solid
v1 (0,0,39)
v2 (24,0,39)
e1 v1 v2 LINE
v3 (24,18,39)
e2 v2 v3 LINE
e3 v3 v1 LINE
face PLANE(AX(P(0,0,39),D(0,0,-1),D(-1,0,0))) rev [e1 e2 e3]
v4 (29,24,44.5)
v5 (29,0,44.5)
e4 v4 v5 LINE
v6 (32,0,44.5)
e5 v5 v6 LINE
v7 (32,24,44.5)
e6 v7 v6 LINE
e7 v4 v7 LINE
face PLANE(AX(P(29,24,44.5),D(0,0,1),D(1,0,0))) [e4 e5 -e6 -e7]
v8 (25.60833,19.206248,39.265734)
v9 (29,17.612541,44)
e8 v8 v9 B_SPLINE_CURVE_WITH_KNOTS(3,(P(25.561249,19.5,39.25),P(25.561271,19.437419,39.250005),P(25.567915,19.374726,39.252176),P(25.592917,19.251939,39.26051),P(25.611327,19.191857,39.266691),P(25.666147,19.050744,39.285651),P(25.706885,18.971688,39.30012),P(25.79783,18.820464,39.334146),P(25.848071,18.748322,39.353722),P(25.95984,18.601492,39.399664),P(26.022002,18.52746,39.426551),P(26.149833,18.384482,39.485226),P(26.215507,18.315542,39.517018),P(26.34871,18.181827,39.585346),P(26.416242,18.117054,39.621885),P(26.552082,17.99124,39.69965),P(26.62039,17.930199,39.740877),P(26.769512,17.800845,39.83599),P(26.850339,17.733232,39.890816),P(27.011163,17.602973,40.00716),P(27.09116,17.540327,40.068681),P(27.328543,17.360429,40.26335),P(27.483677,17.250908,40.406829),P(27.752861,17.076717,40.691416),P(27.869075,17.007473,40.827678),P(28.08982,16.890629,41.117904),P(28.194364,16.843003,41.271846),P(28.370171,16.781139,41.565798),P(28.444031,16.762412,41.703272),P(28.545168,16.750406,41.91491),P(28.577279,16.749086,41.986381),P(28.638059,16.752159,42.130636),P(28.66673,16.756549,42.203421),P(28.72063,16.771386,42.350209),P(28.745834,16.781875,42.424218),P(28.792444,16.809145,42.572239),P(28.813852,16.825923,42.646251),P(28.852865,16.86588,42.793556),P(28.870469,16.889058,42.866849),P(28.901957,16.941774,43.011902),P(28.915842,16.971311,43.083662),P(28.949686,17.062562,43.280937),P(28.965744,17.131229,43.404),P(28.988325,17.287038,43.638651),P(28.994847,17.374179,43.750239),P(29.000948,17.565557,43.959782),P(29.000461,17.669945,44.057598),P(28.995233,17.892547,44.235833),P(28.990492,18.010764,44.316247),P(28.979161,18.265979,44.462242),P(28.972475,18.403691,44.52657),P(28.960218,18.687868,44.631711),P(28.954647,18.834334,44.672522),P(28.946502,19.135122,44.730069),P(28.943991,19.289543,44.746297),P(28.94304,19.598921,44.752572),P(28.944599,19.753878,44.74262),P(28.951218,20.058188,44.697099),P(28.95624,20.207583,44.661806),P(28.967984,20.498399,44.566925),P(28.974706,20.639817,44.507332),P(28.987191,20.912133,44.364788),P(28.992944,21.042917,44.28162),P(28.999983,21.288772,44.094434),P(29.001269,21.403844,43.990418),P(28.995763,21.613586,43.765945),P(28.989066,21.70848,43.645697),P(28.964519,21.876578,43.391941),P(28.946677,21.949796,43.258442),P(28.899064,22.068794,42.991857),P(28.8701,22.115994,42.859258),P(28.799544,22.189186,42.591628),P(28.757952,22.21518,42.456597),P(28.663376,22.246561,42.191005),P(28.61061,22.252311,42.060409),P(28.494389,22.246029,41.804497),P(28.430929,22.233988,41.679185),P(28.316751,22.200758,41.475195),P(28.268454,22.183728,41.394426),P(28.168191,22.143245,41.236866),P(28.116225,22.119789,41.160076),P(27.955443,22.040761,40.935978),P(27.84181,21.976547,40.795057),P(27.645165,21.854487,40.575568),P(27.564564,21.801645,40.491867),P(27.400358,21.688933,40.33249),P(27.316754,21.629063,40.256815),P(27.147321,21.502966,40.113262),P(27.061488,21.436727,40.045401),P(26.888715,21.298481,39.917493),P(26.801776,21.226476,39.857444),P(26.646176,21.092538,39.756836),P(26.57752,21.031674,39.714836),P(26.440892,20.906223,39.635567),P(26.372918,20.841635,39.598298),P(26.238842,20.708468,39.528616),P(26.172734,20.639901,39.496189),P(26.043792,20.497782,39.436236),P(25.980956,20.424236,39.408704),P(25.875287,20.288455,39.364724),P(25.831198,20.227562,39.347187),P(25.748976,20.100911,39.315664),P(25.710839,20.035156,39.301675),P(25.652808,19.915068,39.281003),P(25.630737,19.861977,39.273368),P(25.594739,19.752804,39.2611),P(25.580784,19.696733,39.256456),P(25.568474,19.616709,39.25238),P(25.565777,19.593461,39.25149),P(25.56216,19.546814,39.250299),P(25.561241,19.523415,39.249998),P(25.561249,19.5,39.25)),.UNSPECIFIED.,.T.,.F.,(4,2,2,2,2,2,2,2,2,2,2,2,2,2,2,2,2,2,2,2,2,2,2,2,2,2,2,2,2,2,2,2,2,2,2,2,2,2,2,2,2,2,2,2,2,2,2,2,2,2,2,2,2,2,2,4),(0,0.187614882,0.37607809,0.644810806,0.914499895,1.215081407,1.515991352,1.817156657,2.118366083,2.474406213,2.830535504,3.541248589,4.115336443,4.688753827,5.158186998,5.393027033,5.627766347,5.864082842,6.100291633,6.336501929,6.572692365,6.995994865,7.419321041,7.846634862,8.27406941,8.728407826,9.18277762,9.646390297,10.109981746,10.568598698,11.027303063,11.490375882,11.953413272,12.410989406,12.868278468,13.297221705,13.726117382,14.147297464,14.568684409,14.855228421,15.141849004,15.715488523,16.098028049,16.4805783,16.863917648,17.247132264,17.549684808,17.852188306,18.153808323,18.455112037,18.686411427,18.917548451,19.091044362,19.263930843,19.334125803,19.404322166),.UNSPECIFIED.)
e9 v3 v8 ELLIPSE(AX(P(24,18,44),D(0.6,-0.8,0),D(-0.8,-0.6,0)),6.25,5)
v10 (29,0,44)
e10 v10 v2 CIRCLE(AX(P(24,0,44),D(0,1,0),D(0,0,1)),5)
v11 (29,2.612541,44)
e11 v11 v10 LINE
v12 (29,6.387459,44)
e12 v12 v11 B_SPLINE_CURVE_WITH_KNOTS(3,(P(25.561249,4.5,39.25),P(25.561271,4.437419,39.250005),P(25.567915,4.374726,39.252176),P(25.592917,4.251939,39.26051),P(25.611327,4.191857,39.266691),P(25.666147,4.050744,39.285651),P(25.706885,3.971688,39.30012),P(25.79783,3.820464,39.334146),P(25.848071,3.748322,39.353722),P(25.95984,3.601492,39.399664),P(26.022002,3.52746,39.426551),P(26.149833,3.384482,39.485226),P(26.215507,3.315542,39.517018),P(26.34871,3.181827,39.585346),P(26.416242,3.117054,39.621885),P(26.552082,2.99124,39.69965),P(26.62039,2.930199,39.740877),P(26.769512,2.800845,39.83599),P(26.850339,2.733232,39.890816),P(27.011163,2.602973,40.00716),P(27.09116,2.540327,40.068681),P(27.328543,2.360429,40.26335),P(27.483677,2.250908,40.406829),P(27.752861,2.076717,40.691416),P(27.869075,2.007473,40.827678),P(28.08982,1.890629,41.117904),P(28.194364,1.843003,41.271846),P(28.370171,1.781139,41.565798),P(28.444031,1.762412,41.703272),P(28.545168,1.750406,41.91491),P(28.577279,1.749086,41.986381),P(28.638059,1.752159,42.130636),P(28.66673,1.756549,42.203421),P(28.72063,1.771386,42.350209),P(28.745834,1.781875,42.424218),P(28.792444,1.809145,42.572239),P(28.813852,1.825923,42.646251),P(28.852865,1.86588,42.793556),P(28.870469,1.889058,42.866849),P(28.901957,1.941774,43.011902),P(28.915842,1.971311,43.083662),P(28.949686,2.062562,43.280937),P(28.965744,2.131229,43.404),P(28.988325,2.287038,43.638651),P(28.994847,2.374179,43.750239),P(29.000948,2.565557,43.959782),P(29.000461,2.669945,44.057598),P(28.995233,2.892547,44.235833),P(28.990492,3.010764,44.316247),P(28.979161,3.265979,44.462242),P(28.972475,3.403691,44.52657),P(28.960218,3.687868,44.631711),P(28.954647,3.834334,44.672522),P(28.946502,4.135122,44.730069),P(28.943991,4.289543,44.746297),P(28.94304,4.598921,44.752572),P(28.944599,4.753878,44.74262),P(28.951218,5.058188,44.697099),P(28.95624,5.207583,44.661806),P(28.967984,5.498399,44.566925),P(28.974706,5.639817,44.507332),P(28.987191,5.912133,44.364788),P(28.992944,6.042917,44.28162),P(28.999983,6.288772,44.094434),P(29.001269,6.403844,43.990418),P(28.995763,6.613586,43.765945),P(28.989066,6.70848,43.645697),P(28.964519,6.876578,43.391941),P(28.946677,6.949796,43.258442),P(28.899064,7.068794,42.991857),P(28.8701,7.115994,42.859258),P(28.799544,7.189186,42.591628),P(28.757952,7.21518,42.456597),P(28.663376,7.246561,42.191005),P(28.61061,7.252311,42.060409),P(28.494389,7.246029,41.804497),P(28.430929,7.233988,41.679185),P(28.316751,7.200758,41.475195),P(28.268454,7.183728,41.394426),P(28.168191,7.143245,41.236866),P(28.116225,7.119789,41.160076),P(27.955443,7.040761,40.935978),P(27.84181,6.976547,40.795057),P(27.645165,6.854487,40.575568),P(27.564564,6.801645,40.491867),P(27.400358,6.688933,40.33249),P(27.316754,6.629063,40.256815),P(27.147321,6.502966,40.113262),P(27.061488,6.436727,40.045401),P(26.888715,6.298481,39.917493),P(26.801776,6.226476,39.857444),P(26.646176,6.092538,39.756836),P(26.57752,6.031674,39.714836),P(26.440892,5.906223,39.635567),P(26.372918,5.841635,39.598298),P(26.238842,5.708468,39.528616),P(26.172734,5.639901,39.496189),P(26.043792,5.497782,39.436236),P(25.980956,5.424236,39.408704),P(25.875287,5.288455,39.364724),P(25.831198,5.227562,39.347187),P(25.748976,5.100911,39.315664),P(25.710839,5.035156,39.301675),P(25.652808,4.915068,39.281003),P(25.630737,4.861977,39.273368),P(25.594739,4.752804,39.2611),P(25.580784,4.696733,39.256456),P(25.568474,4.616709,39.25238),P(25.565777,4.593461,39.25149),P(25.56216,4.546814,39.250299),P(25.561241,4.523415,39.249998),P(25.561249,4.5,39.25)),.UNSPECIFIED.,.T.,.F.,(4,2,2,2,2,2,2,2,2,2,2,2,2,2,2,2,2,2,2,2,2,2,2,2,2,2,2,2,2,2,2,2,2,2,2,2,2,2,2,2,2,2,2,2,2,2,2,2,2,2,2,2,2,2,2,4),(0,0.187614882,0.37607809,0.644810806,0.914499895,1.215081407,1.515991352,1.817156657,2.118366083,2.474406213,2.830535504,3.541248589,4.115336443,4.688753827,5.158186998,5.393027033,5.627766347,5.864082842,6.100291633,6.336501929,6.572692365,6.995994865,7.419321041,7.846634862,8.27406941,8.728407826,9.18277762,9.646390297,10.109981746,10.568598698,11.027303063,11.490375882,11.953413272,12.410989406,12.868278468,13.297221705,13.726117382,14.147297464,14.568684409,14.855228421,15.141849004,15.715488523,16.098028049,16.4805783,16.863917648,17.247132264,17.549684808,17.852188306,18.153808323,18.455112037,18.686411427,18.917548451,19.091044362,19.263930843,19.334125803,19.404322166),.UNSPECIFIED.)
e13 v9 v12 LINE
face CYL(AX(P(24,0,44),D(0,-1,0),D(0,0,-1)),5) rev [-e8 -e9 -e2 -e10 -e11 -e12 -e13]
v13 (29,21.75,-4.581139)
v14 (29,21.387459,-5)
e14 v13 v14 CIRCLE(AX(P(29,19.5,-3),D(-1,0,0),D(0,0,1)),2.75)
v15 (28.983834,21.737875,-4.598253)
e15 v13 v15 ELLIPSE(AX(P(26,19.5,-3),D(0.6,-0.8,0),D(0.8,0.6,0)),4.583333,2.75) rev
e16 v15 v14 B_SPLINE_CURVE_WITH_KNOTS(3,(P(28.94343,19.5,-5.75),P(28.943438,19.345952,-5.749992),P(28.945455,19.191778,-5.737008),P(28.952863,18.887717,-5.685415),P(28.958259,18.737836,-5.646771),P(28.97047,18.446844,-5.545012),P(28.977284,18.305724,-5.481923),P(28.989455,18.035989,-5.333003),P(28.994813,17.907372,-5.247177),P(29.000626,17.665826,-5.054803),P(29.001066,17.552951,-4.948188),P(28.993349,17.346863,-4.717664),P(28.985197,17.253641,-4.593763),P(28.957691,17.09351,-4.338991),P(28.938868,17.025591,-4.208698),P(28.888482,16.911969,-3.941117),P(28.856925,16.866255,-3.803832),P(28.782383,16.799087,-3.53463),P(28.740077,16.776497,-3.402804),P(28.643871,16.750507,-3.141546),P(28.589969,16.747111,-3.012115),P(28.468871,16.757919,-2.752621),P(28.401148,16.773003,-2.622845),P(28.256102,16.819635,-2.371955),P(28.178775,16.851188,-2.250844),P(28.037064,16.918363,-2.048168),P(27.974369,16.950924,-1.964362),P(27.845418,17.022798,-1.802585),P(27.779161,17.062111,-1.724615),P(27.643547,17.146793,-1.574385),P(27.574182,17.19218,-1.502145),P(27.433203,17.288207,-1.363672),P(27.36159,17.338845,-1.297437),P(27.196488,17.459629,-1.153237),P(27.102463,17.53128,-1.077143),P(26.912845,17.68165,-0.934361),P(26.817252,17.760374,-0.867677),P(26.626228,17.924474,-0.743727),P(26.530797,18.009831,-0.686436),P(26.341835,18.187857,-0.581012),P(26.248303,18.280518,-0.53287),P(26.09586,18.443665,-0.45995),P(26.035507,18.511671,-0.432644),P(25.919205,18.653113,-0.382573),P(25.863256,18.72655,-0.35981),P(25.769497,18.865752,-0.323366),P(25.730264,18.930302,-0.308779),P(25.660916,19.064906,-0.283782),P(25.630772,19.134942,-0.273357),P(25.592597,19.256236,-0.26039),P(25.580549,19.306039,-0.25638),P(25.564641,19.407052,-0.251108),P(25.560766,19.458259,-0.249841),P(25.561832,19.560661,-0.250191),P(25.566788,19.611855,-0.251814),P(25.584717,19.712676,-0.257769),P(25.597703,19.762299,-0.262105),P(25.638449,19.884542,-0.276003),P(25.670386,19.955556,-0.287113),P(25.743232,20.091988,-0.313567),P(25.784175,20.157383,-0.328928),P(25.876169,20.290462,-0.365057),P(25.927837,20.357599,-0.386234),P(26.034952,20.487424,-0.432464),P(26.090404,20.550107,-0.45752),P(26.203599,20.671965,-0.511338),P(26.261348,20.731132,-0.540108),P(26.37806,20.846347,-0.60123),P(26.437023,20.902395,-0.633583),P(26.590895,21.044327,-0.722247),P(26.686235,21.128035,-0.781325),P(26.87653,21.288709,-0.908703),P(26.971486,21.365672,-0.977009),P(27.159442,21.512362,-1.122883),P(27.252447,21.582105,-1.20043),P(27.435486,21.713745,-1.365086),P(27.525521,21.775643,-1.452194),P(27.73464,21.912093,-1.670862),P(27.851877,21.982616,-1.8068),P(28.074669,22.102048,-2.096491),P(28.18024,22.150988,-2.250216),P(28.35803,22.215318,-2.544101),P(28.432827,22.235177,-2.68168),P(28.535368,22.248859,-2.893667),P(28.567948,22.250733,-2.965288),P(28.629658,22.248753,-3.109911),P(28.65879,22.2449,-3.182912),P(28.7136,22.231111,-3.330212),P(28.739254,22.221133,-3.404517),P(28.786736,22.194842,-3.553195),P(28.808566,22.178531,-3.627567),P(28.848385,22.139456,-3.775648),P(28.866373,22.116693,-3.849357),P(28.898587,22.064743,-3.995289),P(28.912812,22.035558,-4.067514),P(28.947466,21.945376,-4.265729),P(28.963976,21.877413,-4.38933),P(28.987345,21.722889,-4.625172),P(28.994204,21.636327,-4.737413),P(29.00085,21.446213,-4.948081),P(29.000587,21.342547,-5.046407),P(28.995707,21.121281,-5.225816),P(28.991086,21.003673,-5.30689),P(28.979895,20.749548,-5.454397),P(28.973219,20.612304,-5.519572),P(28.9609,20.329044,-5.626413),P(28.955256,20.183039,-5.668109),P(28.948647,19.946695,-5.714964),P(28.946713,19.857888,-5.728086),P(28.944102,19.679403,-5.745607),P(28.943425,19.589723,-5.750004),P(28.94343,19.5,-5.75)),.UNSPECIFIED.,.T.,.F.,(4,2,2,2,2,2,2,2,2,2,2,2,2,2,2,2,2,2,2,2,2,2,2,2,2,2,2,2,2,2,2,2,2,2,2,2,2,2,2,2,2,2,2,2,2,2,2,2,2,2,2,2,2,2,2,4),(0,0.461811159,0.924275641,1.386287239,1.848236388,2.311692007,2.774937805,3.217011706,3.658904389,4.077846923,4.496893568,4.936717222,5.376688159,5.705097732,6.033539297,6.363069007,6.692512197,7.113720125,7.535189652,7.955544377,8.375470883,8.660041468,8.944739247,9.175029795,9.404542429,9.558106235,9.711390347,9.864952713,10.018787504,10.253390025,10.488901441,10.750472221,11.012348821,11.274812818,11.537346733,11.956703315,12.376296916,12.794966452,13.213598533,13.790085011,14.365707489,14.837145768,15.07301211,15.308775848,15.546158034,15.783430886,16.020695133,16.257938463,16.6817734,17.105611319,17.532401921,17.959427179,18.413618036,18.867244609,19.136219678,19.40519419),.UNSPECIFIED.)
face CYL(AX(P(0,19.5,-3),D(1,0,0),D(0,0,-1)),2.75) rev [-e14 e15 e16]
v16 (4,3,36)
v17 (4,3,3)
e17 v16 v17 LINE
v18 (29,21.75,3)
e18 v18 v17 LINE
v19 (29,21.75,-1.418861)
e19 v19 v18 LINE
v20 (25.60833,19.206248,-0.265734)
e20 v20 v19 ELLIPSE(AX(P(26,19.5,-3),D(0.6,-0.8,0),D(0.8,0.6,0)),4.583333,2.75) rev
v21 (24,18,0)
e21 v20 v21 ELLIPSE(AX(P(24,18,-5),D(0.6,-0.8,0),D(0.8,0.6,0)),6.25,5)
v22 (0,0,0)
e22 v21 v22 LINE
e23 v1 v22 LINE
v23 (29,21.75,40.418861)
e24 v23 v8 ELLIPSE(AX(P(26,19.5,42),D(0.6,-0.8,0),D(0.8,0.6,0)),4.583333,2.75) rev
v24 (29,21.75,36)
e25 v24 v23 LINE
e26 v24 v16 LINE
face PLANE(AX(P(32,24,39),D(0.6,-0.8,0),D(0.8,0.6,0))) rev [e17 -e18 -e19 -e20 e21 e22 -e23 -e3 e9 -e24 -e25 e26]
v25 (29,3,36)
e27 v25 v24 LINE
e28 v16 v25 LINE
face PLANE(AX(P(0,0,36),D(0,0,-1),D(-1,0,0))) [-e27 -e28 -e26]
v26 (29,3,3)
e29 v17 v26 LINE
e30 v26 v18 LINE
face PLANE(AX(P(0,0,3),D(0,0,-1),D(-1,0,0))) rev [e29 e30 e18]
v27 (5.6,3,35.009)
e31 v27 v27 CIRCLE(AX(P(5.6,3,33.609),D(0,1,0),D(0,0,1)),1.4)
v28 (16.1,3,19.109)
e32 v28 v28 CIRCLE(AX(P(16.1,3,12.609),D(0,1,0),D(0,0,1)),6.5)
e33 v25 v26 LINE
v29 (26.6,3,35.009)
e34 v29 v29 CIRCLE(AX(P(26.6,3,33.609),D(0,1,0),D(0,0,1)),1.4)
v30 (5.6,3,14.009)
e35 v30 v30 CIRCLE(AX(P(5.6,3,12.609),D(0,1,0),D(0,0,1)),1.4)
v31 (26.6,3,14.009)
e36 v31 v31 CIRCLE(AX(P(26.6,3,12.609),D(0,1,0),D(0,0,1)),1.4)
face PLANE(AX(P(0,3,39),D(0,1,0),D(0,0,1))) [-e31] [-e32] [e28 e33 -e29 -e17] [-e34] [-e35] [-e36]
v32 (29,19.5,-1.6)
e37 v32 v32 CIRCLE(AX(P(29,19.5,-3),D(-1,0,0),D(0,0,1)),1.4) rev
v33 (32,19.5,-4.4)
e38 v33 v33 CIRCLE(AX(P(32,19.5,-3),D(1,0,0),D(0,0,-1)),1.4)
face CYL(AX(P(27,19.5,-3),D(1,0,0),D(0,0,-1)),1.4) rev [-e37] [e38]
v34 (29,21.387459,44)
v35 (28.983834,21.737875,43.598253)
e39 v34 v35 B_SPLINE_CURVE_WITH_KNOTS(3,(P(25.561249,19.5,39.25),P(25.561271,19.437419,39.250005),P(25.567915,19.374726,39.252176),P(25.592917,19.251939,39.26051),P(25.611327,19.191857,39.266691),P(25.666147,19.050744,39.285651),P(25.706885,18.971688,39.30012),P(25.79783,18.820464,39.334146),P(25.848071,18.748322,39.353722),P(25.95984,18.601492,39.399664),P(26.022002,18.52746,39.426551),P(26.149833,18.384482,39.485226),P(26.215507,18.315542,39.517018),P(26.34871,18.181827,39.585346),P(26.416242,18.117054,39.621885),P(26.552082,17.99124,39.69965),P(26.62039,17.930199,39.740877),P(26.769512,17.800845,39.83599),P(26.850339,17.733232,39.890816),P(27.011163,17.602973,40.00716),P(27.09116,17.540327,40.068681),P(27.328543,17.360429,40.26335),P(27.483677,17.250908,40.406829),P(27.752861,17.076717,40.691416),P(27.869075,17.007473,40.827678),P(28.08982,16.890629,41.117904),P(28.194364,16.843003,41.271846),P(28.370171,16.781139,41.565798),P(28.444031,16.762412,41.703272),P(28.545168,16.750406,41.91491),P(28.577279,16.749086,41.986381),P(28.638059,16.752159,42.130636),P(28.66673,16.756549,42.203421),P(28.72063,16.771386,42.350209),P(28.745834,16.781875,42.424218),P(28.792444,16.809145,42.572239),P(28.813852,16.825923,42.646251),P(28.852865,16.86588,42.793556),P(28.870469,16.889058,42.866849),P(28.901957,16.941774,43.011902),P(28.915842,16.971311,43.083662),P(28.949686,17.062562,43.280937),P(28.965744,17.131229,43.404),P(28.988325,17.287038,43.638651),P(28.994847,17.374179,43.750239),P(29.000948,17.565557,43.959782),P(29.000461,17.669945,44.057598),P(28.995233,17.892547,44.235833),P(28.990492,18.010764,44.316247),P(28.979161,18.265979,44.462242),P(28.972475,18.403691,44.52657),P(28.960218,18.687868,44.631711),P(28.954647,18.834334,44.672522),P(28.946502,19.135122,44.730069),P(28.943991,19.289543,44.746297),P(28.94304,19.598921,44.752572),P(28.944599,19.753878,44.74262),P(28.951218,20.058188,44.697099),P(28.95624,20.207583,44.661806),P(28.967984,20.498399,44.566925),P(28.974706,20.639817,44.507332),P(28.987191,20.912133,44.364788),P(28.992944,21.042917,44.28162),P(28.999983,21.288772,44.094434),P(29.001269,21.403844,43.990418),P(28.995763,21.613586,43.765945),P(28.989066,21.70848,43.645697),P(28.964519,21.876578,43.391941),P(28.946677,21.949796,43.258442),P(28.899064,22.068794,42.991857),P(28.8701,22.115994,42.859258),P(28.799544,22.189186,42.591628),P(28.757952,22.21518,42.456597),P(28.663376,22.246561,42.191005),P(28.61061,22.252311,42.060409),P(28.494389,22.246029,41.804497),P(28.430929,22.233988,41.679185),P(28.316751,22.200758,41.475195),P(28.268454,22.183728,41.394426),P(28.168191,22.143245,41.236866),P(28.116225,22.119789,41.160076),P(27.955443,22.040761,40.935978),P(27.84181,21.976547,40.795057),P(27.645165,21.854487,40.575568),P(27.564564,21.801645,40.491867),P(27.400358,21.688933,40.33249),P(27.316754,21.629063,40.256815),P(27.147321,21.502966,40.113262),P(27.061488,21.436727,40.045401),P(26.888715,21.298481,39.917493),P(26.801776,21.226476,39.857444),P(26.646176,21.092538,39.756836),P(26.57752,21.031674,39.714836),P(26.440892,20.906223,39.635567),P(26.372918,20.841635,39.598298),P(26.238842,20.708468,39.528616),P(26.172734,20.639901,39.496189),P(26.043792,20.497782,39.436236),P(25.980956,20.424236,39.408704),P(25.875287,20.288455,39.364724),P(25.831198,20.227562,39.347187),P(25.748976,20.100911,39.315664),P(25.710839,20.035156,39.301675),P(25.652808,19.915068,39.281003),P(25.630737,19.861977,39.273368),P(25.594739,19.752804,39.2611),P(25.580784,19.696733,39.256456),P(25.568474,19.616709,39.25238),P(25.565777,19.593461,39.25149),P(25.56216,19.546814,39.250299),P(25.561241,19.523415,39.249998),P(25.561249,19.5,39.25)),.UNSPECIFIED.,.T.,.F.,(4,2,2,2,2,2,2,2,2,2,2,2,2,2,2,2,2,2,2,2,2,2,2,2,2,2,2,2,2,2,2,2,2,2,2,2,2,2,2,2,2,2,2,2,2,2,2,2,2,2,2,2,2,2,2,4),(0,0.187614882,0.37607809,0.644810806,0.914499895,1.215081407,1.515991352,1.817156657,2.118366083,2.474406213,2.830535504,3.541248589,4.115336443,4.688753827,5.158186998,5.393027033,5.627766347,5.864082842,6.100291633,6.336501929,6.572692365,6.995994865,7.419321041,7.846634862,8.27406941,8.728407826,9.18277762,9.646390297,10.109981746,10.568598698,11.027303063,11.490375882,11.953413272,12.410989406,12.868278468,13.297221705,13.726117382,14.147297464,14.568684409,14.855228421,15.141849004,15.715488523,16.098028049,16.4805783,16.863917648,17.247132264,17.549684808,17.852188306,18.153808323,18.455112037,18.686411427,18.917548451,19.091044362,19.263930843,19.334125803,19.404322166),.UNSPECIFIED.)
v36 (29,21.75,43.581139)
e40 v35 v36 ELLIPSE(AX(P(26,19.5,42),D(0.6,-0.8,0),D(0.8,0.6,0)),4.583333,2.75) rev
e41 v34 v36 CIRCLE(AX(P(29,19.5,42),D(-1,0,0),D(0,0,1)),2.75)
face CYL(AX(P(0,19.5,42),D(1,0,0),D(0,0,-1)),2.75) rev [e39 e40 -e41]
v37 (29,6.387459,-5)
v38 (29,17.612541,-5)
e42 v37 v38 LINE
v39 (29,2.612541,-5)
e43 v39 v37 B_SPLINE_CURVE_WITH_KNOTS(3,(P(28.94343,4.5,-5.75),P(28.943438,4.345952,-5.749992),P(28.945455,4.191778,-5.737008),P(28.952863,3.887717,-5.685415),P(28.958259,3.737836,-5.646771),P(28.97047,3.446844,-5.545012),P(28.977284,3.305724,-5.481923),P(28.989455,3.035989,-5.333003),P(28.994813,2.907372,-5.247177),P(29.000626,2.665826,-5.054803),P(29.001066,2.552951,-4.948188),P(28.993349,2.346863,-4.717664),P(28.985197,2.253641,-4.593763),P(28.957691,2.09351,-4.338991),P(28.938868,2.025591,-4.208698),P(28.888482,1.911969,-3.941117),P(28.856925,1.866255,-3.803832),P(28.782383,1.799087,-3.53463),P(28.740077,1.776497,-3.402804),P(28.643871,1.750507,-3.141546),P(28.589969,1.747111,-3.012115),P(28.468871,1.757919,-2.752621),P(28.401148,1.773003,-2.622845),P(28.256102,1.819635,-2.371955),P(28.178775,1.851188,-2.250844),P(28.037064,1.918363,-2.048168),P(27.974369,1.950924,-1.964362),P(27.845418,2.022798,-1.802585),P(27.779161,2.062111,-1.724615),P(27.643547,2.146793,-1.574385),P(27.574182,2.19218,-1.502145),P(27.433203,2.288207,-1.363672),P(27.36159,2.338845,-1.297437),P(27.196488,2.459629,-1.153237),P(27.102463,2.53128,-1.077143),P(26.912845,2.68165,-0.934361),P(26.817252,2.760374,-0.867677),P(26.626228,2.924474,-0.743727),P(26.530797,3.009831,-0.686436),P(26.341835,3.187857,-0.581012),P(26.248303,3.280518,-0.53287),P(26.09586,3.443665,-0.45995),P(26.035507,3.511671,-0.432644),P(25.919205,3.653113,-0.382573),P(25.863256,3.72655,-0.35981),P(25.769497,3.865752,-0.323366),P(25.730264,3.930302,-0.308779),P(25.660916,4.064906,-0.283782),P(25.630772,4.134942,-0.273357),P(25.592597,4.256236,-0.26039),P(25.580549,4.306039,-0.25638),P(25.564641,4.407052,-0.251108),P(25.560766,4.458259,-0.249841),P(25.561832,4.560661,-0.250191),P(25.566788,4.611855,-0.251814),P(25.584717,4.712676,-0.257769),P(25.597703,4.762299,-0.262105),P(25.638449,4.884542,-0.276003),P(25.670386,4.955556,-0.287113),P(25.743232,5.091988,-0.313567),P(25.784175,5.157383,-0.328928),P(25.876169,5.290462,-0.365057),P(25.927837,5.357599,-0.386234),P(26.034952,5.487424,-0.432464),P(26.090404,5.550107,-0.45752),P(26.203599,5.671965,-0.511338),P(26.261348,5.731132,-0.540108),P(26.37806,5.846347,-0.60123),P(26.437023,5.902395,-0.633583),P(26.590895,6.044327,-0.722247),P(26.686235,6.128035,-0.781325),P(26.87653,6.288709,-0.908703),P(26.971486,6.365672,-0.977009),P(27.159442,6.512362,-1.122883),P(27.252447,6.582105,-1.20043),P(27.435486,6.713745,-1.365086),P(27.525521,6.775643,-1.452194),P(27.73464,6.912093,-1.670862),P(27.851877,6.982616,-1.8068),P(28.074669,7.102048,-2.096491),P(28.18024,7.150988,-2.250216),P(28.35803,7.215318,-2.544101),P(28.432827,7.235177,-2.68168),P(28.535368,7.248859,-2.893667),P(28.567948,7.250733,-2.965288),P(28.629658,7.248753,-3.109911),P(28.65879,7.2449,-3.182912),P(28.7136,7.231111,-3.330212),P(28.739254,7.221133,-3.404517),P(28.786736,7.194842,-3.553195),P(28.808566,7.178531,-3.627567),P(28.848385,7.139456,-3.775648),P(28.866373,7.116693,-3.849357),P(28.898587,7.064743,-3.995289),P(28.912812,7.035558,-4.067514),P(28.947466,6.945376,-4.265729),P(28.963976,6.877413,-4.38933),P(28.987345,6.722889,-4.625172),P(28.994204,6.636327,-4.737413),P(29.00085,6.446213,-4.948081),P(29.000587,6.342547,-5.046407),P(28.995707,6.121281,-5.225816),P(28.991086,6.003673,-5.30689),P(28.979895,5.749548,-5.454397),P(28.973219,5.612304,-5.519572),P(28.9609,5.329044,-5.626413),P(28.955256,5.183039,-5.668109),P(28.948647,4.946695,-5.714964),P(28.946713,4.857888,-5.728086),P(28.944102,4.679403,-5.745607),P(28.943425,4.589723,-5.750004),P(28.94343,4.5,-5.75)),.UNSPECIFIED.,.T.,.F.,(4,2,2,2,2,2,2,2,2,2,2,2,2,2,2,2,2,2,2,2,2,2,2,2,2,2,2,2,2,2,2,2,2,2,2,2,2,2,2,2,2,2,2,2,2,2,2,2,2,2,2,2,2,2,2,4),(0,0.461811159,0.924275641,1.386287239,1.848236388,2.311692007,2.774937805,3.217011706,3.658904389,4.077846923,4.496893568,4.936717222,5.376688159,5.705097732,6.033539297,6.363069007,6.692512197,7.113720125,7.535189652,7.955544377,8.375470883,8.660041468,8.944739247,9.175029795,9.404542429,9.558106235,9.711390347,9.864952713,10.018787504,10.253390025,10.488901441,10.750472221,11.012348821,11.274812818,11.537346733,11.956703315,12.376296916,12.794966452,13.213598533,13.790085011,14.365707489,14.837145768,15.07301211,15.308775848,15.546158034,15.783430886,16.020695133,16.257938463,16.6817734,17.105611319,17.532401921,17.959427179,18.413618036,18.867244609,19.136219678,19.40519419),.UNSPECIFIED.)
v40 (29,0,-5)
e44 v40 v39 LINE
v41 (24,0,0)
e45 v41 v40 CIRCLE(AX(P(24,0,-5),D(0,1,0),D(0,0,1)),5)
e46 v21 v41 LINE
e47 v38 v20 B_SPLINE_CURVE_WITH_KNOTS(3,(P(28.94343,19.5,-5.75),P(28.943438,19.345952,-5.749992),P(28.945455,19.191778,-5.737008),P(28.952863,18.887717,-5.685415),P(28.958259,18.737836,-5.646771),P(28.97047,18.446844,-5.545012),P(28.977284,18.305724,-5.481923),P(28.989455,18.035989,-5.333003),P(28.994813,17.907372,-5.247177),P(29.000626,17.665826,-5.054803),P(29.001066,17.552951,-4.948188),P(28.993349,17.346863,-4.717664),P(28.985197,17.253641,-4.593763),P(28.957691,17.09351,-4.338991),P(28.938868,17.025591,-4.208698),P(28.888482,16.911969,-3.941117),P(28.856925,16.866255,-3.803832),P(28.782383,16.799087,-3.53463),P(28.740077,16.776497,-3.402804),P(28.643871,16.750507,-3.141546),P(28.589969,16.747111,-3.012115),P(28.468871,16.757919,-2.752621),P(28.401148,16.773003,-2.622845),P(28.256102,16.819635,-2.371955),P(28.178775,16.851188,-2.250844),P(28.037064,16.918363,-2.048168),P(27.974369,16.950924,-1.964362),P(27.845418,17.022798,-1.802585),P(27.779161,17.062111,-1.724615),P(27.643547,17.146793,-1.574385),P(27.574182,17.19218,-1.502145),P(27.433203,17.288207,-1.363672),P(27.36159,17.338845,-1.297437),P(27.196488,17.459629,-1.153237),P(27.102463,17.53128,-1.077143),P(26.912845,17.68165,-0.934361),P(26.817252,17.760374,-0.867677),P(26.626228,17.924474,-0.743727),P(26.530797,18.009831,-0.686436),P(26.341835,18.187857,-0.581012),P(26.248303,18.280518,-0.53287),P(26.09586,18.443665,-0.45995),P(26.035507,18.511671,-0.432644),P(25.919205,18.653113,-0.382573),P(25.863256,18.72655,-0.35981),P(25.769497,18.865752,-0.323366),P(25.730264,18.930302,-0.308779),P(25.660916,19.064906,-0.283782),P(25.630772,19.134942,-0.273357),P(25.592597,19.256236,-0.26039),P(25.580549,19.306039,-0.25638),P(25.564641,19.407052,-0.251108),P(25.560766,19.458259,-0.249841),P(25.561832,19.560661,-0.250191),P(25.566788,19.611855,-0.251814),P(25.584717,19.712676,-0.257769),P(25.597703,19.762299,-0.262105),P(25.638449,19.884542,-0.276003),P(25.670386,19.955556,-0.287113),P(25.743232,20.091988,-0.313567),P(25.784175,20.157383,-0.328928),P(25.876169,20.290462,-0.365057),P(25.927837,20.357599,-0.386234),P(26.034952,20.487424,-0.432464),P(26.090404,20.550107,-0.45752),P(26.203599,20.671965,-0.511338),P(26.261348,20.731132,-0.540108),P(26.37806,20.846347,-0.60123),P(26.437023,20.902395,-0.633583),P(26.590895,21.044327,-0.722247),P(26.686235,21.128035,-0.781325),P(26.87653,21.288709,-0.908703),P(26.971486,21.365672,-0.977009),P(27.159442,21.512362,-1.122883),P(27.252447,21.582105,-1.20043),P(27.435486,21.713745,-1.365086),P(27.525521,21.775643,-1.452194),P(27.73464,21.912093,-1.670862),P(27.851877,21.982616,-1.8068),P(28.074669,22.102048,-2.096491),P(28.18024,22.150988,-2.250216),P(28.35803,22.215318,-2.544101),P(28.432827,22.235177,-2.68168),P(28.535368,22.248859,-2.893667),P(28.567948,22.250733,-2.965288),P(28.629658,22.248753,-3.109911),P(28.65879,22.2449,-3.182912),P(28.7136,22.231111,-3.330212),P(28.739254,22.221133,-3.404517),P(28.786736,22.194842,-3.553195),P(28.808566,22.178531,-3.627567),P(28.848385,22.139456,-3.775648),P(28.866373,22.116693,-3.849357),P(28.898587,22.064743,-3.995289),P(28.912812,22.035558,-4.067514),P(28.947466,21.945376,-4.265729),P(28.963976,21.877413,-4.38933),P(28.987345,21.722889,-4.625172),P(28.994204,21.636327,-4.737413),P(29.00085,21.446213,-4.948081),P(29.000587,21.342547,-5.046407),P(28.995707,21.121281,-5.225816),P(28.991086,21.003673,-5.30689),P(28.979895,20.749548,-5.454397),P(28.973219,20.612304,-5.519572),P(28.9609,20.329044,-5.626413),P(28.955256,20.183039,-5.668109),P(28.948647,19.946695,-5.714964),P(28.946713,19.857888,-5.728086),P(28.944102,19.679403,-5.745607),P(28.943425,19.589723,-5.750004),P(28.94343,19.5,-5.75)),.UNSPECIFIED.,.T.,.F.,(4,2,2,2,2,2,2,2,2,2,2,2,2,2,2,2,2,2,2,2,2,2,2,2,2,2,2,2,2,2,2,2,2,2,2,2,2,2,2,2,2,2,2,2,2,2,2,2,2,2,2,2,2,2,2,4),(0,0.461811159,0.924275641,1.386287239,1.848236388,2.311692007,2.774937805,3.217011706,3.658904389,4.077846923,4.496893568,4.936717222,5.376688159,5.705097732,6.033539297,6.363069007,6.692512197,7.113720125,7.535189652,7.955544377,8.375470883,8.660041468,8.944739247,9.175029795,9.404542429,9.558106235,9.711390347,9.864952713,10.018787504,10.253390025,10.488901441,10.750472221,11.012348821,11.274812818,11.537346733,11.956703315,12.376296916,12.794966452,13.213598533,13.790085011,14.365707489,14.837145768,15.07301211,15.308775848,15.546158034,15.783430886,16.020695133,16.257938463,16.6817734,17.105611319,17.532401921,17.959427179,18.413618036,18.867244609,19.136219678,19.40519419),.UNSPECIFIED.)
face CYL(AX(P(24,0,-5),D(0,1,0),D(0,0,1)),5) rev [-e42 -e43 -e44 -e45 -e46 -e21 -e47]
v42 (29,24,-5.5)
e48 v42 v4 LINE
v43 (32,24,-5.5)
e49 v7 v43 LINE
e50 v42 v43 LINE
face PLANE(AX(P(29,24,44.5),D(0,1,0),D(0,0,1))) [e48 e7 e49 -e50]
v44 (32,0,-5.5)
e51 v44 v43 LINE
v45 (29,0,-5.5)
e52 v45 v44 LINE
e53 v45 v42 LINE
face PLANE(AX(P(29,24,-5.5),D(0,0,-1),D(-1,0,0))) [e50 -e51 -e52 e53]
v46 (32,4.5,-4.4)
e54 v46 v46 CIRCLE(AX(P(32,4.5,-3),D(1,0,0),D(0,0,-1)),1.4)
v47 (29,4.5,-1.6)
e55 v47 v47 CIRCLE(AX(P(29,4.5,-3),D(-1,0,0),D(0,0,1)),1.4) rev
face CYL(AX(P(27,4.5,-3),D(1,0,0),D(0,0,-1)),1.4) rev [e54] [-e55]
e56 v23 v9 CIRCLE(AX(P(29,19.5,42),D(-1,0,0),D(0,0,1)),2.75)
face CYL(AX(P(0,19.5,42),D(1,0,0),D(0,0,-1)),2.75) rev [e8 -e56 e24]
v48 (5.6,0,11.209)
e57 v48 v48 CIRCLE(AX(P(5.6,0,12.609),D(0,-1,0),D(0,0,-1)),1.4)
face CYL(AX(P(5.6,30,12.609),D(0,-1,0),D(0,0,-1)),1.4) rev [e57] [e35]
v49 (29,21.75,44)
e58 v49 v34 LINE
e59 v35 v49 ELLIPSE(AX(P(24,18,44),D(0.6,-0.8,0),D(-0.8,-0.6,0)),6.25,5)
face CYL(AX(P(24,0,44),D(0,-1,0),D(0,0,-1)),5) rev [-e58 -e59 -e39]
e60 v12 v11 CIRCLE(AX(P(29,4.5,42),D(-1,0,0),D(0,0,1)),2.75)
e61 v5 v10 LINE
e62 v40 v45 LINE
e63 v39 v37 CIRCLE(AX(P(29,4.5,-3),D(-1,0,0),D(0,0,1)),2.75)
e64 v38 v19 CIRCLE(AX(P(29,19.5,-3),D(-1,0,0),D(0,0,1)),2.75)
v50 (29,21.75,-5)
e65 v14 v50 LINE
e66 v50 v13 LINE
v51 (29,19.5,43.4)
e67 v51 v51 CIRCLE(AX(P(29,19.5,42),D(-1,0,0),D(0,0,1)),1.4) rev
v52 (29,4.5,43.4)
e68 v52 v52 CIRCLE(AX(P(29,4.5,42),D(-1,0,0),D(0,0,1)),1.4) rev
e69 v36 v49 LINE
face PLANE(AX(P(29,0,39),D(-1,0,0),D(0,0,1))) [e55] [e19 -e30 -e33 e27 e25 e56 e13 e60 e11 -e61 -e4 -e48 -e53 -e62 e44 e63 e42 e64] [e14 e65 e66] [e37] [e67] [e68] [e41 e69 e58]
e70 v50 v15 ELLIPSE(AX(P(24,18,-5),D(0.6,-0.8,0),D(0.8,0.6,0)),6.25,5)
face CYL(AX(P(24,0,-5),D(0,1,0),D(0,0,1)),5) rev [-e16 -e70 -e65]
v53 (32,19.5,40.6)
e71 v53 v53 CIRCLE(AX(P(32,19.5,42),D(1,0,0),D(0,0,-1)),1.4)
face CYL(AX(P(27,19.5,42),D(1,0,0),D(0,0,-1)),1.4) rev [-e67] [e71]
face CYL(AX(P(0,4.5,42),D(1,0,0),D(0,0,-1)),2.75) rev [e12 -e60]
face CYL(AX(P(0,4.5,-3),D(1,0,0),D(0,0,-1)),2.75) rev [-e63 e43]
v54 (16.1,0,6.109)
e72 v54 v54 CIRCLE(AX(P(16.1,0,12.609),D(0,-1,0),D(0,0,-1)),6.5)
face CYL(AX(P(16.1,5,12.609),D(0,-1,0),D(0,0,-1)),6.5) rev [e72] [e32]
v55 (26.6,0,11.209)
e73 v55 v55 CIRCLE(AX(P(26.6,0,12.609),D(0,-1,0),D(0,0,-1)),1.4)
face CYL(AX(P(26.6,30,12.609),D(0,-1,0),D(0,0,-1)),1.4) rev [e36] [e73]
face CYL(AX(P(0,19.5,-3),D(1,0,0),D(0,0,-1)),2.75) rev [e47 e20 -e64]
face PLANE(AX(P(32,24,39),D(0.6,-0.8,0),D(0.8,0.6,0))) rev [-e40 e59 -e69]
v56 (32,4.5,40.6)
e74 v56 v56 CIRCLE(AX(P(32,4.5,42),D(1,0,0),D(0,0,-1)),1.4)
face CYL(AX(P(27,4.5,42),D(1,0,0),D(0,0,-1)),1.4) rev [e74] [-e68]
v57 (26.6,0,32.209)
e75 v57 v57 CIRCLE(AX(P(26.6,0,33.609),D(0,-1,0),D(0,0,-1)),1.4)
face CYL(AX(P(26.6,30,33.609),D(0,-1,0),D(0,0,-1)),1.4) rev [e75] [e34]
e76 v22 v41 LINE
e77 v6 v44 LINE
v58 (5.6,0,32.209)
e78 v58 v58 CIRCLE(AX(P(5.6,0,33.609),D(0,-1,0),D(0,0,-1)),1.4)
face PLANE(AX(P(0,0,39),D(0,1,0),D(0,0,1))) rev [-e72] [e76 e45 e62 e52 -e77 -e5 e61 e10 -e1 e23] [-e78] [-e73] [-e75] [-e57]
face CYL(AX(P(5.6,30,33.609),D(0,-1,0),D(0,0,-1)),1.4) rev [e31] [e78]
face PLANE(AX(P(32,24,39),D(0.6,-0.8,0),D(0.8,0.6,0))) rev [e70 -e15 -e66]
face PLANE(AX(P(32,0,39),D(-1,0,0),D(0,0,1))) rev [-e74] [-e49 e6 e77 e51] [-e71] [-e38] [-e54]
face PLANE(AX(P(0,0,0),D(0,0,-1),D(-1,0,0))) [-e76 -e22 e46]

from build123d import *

# Parameters (mm, degrees)
EXTRUDE_1_DEPTH           = 39
SHELL_1_T                 = -3
SKETCH_2_R                = 1.4
CUT_EXTRUDE_1_DEPTH       = 30
SKETCH_3_R                = 6.5
CUT_EXTRUDE_2_DEPTH       = 5
SKETCH_5_W                = 50
SKETCH_5_H                = 24
EXTRUDE_2_DEPTH           = 3
SKETCH_4_R                = 1.4
CUT_EXTRUDE_3_DEPTH       = 5
FILLET_1_R                = 5
CUT_EXTRUDE_4_OUTLINE_R   = 1.4
CUT_EXTRUDE_4_OUTLINE_R_2 = 2.75
CUT_EXTRUDE_4_DEPTH       = 3.43874985


with BuildPart() as part:
    # ｽｹｯﾁ1 → ﾎﾞｽ - 押し出し1 (new body)
    with BuildSketch(Plane.XY):
        Polygon((0, 0), (32, 0), (32, 24), align=None)
    extrude(amount=EXTRUDE_1_DEPTH)

    # ｼｪﾙ1
    shell_1_openings = [part.faces().sort_by_distance(p)[0] for p in [
        (16, 12, 19.5),
    ]]
    offset(amount=SHELL_1_T, openings=shell_1_openings, kind=Kind.INTERSECTION)

    # ｽｹｯﾁ2 → ｶｯﾄ - 押し出し1 (cut)
    with BuildSketch(Plane.XZ):
        with Locations(Location((26.6, 12.609, 0), (0, 0, 270))):
            Circle(SKETCH_2_R)
        with Locations(Location((5.6, 12.609, 0), (0, 0, 270))):
            Circle(SKETCH_2_R)
        with Locations(Location((5.6, 33.609, 0), (0, 0, 270))):
            Circle(SKETCH_2_R)
        with Locations(Location((26.6, 33.609, 0), (0, 0, 270))):
            Circle(SKETCH_2_R)
    extrude(amount=-CUT_EXTRUDE_1_DEPTH, mode=Mode.SUBTRACT)

    # ｽｹｯﾁ3 → ｶｯﾄ - 押し出し2 (cut)
    with BuildSketch(Plane.XZ):
        with Locations(Location((16.1, 12.609, 0), (0, 0, 270))):
            Circle(SKETCH_3_R)
    extrude(amount=-CUT_EXTRUDE_2_DEPTH, mode=Mode.SUBTRACT)

    # ｽｹｯﾁ5 → ﾎﾞｽ - 押し出し2 (add)
    with BuildSketch(Plane(origin=(32, 0, 0), x_dir=(0, 0, -1), z_dir=(1, 0, 0))):
        with Locations((-19.5, 12)):
            Rectangle(SKETCH_5_W, SKETCH_5_H)
    extrude(amount=-EXTRUDE_2_DEPTH)

    # ｽｹｯﾁ4 → ｶｯﾄ - 押し出し3 (cut)
    with BuildSketch(Plane(origin=(32, 0, 0), x_dir=(0, 0, -1), z_dir=(1, 0, 0))):
        with Locations((3, 19.5)):
            Circle(SKETCH_4_R)
        with Locations((-42, 19.5)):
            Circle(SKETCH_4_R)
        with Locations((-42, 4.5)):
            Circle(SKETCH_4_R)
        with Locations((3, 4.5)):
            Circle(SKETCH_4_R)
    extrude(amount=-CUT_EXTRUDE_3_DEPTH, mode=Mode.SUBTRACT)

    # ﾌｨﾚｯﾄ1
    # the kernel refuses this fillet: 5 mm, written as the material it adds along each edge
    with BuildSketch(Plane(origin=(29, 34.25, 39), x_dir=(-1, 0, 0), z_dir=(0, -1, 0))) as fillet_1_piece_1_section:
        with BuildLine():
            CenterArc((FILLET_1_R, -FILLET_1_R), FILLET_1_R, 90, 90)
            Line((0, -FILLET_1_R), (0, 0))
            Line((0, 0), (FILLET_1_R, 0))
        make_face()
    fillet_1_piece_1 = extrude(amount=34.25, mode=Mode.PRIVATE)
    fillet_1_piece_1 = split(fillet_1_piece_1, bisect_by=Plane(origin=(35, 26.25, 39), z_dir=(0.6, -0.8, 0)), keep=Keep.TOP, mode=Mode.PRIVATE)
    fillet_1_piece_1 = fillet_1_piece_1 - Plane(origin=(29, 4.5, 42), x_dir=(0, 0, -1), z_dir=(1, 0, 0)) * Cylinder(1.4, 89, mode=Mode.PRIVATE)
    fillet_1_piece_1 = fillet_1_piece_1 - Plane(origin=(29, 19.5, 42), x_dir=(0, 0, -1), z_dir=(1, 0, 0)) * Cylinder(1.4, 89, mode=Mode.PRIVATE)
    add(fillet_1_piece_1)
    with BuildSketch(Plane(origin=(29, 34.25, 0), x_dir=(-1, 0, 0), z_dir=(0, -1, 0))) as fillet_1_piece_2_section:
        with BuildLine():
            CenterArc((FILLET_1_R, FILLET_1_R), FILLET_1_R, 180, 90)
            Line((0, FILLET_1_R), (0, 0))
            Line((0, 0), (FILLET_1_R, 0))
        make_face()
    fillet_1_piece_2 = extrude(amount=34.25, mode=Mode.PRIVATE)
    fillet_1_piece_2 = split(fillet_1_piece_2, bisect_by=Plane(origin=(35, 26.25, 0), z_dir=(0.6, -0.8, 0)), keep=Keep.TOP, mode=Mode.PRIVATE)
    fillet_1_piece_2 = fillet_1_piece_2 - Plane(origin=(29, 4.5, -3), x_dir=(0, 0, -1), z_dir=(1, 0, 0)) * Cylinder(1.4, 89, mode=Mode.PRIVATE)
    fillet_1_piece_2 = fillet_1_piece_2 - Plane(origin=(29, 19.5, -3), x_dir=(0, 0, -1), z_dir=(1, 0, 0)) * Cylinder(1.4, 89, mode=Mode.PRIVATE)
    add(fillet_1_piece_2)

    # ｶｯﾄ - 押し出し4: read off the stored shape, not the designer's step
    # ｶｯﾄ - 押し出し4 outline → ｶｯﾄ - 押し出し4 (cut)
    # profile 1 of 4: a face of its own
    with BuildSketch(Plane.ZY.offset(-29)):
        with BuildLine():
            ThreePointArc((44, 17.612541391), (44.75, 19.5), (44, 21.387458609))
            ThreePointArc((44, 21.387458609), (43.799721616, 21.579303274), (43.58113883, 21.75))
            ThreePointArc((43.58113883, 21.75), (42, 22.25), (40.41886117, 21.75))
            ThreePointArc((40.41886117, 21.75), (39.920696726, 17.700278384), (44, 17.612541391))
        make_face()
        with Locations((42, 19.5)):
            Circle(CUT_EXTRUDE_4_OUTLINE_R, mode=Mode.SUBTRACT)
    # profile 2 of 4: a face of its own
    with BuildSketch(Plane.ZY.offset(-29)):
        with BuildLine():
            ThreePointArc((44, 2.612541391), (44.75, 4.5), (44, 6.387458609))
            ThreePointArc((44, 6.387458609), (39.25, 4.5), (44, 2.612541391))
        make_face()
        with Locations((42, 4.5)):
            Circle(CUT_EXTRUDE_4_OUTLINE_R, mode=Mode.SUBTRACT)
    # profile 3 of 4: a face of its own
    with BuildSketch(Plane.ZY.offset(-29)):
        with BuildLine():
            ThreePointArc((-5, 21.387458609), (-1.200278384, 17.420696726), (-4.58113883, 21.75))
            ThreePointArc((-4.58113883, 21.75), (-4.799721616, 21.579303274), (-5, 21.387458609))
        make_face()
        with Locations((-3, 19.5)):
            Circle(CUT_EXTRUDE_4_OUTLINE_R, mode=Mode.SUBTRACT)
    # profile 4 of 4: a face of its own
    with BuildSketch(Plane.ZY.offset(-29)):
        with Locations((-3, 4.5)):
            Circle(CUT_EXTRUDE_4_OUTLINE_R_2)
        with Locations((-3, 4.5)):
            Circle(CUT_EXTRUDE_4_OUTLINE_R, mode=Mode.SUBTRACT)
    extrude(amount=CUT_EXTRUDE_4_DEPTH, mode=Mode.SUBTRACT)


solid = part.part
